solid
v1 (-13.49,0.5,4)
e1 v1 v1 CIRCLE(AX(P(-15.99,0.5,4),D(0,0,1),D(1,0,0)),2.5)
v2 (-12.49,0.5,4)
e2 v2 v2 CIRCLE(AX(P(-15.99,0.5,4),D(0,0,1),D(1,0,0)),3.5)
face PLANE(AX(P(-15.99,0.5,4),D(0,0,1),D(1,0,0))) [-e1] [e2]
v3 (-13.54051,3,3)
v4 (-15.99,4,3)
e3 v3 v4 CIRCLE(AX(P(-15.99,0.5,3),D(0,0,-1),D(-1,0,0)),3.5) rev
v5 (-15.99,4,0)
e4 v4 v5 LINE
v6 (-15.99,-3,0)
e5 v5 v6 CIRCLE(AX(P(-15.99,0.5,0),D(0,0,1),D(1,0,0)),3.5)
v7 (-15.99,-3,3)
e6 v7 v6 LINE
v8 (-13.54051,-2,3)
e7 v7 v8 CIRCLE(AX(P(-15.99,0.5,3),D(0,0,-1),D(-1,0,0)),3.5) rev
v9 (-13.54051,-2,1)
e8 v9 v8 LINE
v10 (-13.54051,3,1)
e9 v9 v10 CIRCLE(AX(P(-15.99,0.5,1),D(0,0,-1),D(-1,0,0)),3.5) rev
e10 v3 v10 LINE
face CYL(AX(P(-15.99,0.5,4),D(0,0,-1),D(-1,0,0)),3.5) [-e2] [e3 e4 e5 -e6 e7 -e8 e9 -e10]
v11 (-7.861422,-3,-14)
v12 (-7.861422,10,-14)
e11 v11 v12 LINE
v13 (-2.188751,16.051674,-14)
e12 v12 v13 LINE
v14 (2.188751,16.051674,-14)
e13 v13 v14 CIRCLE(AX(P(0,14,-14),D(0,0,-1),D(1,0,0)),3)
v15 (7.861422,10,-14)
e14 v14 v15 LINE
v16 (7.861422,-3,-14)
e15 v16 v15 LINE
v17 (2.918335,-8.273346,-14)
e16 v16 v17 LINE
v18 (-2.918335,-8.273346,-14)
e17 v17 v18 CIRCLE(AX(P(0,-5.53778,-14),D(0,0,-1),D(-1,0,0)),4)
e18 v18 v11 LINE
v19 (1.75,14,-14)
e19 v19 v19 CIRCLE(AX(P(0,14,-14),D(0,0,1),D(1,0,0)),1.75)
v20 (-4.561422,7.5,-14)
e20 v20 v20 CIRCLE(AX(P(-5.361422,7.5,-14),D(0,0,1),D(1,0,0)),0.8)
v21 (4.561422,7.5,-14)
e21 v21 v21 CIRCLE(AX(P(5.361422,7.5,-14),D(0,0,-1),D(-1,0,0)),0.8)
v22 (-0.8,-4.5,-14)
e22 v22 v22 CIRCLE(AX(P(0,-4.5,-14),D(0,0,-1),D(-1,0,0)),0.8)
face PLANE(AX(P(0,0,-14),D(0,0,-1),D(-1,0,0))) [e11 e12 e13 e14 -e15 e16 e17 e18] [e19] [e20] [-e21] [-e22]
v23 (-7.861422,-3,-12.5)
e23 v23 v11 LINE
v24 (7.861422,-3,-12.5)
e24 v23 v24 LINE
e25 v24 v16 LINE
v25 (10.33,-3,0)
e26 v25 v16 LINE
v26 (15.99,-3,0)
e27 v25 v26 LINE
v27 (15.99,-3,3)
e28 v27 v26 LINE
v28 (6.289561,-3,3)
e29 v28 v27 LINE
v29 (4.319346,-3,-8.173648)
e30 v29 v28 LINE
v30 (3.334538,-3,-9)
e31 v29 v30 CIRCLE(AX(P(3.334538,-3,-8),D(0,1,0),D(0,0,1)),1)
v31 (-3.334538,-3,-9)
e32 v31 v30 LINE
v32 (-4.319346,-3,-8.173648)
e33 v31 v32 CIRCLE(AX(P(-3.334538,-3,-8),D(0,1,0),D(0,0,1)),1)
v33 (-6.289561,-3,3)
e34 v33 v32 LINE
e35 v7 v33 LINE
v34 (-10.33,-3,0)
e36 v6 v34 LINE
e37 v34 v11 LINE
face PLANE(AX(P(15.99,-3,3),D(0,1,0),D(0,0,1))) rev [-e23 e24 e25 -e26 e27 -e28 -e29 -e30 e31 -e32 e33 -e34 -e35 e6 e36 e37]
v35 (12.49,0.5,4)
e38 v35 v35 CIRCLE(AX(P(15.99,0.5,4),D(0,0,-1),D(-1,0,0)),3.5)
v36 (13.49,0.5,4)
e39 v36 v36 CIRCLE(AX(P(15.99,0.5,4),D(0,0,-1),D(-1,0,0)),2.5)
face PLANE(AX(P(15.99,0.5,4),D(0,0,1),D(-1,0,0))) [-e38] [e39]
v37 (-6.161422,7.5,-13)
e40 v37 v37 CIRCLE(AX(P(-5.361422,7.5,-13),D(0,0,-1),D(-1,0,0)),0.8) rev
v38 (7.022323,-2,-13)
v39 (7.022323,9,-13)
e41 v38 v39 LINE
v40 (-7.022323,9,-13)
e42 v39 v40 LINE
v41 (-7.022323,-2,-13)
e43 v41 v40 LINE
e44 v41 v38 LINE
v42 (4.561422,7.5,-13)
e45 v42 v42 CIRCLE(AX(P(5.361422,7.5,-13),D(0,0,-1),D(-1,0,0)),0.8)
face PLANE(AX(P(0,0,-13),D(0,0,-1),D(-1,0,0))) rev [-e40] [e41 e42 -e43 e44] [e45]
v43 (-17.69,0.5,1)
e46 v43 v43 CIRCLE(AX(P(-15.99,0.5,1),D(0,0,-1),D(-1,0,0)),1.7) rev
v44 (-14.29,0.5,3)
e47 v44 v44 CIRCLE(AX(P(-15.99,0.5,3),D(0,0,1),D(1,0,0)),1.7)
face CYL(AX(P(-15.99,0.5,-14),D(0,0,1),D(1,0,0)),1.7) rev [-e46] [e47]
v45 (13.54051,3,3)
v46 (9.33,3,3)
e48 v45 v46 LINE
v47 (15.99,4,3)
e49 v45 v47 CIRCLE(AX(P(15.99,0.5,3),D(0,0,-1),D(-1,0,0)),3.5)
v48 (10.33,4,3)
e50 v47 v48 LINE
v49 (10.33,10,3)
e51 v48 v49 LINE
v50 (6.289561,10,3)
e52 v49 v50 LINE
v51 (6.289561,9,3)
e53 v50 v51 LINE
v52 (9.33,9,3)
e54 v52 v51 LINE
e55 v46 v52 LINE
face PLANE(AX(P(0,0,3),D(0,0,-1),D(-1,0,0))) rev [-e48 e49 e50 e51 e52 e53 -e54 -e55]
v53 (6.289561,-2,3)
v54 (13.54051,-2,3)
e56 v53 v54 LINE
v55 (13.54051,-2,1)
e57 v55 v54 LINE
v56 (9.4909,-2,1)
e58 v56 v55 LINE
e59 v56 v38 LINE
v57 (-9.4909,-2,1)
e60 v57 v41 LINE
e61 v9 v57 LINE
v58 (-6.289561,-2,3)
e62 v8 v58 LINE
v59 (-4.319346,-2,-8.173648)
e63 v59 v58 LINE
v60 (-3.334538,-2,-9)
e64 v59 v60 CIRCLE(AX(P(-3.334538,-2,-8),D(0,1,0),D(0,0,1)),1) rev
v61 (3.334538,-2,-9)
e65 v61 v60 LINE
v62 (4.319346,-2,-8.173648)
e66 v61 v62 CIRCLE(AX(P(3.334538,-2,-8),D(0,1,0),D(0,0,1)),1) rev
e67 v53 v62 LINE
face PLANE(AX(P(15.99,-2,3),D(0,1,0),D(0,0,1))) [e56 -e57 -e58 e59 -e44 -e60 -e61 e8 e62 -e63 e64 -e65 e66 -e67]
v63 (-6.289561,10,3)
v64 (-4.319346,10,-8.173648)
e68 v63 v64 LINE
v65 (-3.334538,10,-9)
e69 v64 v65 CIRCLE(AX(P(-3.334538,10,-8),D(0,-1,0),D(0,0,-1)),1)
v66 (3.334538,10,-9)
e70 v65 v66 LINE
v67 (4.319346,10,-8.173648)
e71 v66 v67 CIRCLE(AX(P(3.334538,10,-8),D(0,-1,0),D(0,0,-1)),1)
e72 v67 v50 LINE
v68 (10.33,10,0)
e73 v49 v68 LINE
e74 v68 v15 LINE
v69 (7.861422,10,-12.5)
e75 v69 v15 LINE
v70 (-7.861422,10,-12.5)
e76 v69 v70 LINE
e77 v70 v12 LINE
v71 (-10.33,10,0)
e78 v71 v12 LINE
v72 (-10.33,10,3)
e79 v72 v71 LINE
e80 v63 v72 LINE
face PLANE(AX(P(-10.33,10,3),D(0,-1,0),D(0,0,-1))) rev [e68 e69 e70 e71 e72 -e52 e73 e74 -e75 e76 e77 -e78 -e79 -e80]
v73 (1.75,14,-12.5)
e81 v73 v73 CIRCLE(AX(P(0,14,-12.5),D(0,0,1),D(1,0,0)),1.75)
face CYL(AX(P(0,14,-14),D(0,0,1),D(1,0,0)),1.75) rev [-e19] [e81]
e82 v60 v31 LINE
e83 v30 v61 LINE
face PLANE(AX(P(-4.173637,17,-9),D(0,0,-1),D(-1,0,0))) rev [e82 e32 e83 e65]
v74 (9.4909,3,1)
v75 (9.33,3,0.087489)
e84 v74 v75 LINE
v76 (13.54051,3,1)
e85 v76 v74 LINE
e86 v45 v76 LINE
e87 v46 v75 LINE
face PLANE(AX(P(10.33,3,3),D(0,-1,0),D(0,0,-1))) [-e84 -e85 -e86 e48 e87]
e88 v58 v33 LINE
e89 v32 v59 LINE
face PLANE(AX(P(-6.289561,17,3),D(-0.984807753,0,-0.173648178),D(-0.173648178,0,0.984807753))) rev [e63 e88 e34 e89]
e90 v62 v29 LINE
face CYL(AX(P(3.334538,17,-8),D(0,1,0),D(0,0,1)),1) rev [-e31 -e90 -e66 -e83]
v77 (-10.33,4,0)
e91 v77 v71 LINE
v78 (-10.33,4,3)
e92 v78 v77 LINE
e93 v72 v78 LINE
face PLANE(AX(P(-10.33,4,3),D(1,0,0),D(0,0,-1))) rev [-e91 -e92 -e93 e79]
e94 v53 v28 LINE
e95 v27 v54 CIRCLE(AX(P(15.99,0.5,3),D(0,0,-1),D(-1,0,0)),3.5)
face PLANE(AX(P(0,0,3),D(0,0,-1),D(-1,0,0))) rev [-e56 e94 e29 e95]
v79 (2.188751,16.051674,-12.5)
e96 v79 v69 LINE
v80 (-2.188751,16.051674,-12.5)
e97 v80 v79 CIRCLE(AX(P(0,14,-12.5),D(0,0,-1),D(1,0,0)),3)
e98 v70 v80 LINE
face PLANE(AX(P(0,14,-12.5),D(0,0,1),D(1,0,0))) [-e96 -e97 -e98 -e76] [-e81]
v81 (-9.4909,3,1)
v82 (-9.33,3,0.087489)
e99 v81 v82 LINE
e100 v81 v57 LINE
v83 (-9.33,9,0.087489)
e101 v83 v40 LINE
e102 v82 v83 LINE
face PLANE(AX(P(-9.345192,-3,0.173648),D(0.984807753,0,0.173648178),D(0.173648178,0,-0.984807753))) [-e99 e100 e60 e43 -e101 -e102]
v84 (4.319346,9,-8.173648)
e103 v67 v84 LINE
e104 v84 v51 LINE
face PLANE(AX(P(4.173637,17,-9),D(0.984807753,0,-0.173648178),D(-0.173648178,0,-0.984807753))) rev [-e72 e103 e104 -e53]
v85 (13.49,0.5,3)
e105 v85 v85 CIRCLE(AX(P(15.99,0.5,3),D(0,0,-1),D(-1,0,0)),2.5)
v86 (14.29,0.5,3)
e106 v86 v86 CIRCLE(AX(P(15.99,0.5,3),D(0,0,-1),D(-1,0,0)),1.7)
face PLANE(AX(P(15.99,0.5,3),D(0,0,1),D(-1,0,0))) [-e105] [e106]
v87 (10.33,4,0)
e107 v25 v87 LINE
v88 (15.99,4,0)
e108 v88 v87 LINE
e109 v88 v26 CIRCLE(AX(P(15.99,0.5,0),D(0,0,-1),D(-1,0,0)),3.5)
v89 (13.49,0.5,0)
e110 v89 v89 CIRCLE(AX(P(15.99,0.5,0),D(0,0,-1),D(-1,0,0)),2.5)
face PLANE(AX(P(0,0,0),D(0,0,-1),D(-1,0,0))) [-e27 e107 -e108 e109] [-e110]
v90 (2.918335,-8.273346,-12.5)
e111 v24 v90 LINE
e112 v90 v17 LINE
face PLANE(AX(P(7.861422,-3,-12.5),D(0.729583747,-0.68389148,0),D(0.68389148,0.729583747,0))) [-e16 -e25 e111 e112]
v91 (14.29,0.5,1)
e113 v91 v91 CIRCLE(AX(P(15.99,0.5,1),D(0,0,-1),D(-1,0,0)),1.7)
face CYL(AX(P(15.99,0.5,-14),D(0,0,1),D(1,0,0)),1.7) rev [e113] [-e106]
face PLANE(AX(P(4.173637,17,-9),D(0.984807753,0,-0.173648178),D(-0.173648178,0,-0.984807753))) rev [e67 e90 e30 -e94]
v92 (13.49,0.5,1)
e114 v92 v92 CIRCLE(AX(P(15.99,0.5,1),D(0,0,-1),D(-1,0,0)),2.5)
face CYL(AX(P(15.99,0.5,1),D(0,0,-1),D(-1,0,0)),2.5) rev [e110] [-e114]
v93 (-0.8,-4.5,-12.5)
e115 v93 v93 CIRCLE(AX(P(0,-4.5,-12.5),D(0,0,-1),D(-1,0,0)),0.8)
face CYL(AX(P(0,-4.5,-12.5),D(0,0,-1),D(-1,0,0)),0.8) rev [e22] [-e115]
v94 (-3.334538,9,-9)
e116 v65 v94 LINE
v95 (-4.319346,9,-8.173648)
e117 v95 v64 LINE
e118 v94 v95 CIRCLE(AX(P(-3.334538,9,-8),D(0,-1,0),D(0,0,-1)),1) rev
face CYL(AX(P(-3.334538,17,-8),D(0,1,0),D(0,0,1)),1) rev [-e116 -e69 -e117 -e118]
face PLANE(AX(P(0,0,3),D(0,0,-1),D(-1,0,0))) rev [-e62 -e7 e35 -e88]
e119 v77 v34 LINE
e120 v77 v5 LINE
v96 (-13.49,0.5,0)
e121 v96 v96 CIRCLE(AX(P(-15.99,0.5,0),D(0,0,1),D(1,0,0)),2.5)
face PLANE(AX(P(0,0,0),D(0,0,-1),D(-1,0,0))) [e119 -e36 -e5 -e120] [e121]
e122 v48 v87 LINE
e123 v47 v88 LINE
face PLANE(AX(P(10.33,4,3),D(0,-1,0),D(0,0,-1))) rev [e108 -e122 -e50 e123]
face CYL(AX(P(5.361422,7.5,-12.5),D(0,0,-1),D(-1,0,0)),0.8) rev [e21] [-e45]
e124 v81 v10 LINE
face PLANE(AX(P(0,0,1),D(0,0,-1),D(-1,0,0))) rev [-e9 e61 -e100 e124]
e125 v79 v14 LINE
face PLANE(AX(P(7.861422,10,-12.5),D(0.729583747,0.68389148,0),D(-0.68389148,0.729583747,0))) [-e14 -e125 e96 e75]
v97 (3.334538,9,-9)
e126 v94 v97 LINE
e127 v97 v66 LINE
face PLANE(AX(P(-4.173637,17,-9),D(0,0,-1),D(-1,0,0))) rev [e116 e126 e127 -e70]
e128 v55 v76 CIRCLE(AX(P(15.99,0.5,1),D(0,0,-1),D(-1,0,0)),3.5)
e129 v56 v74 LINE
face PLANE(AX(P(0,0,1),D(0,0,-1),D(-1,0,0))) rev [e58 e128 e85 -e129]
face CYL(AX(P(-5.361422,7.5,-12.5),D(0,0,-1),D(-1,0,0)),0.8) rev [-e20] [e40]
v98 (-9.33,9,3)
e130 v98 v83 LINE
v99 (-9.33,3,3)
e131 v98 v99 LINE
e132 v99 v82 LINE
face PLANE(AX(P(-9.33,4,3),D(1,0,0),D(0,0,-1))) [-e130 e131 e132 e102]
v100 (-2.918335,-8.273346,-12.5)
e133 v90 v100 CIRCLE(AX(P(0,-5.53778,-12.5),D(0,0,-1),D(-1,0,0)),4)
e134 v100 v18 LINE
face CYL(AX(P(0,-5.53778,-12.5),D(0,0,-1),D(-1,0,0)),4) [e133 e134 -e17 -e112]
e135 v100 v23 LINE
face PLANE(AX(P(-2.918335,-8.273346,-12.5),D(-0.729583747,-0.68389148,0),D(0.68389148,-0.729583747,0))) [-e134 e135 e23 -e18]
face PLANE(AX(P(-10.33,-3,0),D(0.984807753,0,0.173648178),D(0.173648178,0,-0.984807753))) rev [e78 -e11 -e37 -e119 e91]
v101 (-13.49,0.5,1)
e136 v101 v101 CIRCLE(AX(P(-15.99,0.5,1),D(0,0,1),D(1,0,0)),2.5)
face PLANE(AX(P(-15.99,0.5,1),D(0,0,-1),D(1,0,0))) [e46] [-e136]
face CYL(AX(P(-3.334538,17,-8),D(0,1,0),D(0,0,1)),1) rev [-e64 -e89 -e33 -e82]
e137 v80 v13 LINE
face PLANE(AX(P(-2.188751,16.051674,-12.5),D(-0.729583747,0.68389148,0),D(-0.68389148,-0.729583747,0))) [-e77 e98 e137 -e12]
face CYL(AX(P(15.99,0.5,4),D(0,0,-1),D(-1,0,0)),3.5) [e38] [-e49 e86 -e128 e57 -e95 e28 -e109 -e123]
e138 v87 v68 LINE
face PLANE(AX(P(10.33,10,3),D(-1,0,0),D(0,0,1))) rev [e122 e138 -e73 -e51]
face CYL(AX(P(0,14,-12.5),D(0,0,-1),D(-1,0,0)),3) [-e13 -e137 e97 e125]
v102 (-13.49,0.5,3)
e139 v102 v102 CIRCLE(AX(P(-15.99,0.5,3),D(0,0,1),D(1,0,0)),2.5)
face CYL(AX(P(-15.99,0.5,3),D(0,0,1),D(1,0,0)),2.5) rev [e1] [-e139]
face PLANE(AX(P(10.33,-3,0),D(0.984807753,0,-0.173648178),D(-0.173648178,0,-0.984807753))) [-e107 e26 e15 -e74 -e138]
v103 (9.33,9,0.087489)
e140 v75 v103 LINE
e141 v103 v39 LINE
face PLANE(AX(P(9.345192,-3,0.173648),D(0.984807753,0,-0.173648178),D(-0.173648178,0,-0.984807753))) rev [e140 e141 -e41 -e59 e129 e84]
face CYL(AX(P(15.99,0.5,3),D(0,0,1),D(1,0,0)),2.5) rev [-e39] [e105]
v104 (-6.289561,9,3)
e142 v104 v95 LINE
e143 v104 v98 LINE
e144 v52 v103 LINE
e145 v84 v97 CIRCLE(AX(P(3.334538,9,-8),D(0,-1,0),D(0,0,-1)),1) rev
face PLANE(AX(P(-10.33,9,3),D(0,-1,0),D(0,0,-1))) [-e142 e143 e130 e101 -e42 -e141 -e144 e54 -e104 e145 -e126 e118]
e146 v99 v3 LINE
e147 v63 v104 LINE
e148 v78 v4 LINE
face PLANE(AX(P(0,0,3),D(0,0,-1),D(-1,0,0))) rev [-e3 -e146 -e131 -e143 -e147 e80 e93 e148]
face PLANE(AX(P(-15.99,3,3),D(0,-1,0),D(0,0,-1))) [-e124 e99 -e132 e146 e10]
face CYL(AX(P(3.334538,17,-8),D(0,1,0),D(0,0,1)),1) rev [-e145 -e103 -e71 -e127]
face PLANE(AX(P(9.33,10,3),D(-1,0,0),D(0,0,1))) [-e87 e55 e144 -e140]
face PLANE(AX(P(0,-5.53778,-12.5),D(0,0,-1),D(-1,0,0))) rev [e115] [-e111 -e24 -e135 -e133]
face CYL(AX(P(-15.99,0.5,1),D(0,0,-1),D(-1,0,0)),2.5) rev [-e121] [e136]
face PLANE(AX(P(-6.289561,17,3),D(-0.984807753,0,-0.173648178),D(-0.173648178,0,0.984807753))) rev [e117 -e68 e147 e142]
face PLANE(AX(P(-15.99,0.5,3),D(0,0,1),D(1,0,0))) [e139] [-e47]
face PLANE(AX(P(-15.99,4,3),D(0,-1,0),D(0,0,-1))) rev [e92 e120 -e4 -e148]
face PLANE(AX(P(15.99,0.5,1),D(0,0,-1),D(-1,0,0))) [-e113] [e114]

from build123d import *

# Parameters (mm, degrees)
ESTRUSIONE_ESTRUSIONE1_DEPTH = 3
SCHIZZO2_W                   = 20.66
SCHIZZO2_H                   = 13
ESTRUSIONE_ESTRUSIONE2_DEPTH = 14
TAGLIO_ESTRUSIONE1_DEPTH     = 25.91345219
SVUOTA1_T                    = -1
SCHIZZO4_R                   = 3.5
ESTRUSIONE_ESTRUSIONE3_DEPTH = 4
SCHIZZO5_R                   = 2.5
TAGLIO_ESTRUSIONE2_DEPTH     = 1
SCHIZZO6_R                   = 1.7
TAGLIO_ESTRUSIONE3_DEPTH     = 28.728326671
ESTRUSIONE_ESTRUSIONE4_DEPTH = 1.5
SCHIZZO8_R                   = 1.75
TAGLIO_ESTRUSIONE4_DEPTH     = 31.677517827
SCHIZZO9_R                   = 0.8
TAGLIO_ESTRUSIONE5_DEPTH     = 1.5
TAGLIO_ESTRUSIONE6_DEPTH     = 32.238759578
RACCORDO1_R                  = 1
SPECCHIA12_START             = 9
SPECCHIA12_DEPTH             = 1
RACCORDO2_R                  = 1
SPECCHIA15_START             = 9
SPECCHIA15_DEPTH             = 1
SCHIZZO12_R                  = 0.8
ESTRUSIONE_ESTRUSIONE5_DEPTH = 1.5
TAGLIO_ESTRUSIONE7_START     = -1
SCHIZZO13_R                  = 2.5
TAGLIO_ESTRUSIONE7_DEPTH     = 1


# Read off the part's stored shape, not the designer's step: Specchia12, Specchia15
with BuildPart() as part:
    # Schizzo1 → Estrusione-Estrusione1 (new body)
    with BuildSketch(Plane.XY):
        Polygon((-15.99, 4), (-10.33, 4), (-10.33, 10), (10.33, 10), (10.33, 4), (15.99, 4), (15.99, -3), (-15.99, -3), align=None)
    extrude(amount=ESTRUSIONE_ESTRUSIONE1_DEPTH)

    # Schizzo2 → Estrusione-Estrusione2 (add)
    with BuildSketch(Plane.XY):
        with Locations((0, 3.5)):
            Rectangle(SCHIZZO2_W, SCHIZZO2_H)
    extrude(amount=-ESTRUSIONE_ESTRUSIONE2_DEPTH)

    # Schizzo3 → Taglio-Estrusione1 (cut, through all)
    with BuildSketch(Plane(origin=(0, 10, 0), x_dir=(1, 0, 0), z_dir=(0, 1, 0))):
        Polygon((-10.33, 0), (-7.86142227, 14), (-10.33, 14), align=None)
    taglio_estrusione1 = extrude(amount=-TAGLIO_ESTRUSIONE1_DEPTH, mode=Mode.SUBTRACT)

    # Specchia1: Taglio-Estrusione1 across plane
    add(taglio_estrusione1.mirror(Plane(origin=(0, 0, 0), x_dir=(0, 0, 1), z_dir=(1, 0, 0))), mode=Mode.SUBTRACT)

    # Svuota1
    svuota1_openings = [part.faces().sort_by_distance(p)[0] for p in [
        (0, 2.81654304, 3),
    ]]
    offset(amount=SVUOTA1_T, openings=svuota1_openings, kind=Kind.INTERSECTION)

    # Schizzo4 → Estrusione-Estrusione3 (add)
    with BuildSketch(Plane.XY):
        with Locations(Location((-15.99, 0.5, 0), (0, 0, 270))):
            Circle(SCHIZZO4_R)
    estrusione_estrusione3 = extrude(amount=ESTRUSIONE_ESTRUSIONE3_DEPTH)

    # Schizzo5 → Taglio-Estrusione2 (cut)
    with BuildSketch(Plane.XY.offset(4)):
        with Locations((-15.99, 0.5)):
            Circle(SCHIZZO5_R)
    taglio_estrusione2 = extrude(amount=-TAGLIO_ESTRUSIONE2_DEPTH, mode=Mode.SUBTRACT)

    # Schizzo6 → Taglio-Estrusione3 (cut, through all)
    with BuildSketch(Plane.XY.offset(3)):
        with Locations((-15.99, 0.5)):
            Circle(SCHIZZO6_R)
    taglio_estrusione3 = extrude(amount=-TAGLIO_ESTRUSIONE3_DEPTH, mode=Mode.SUBTRACT)

    # Specchia2: Estrusione-Estrusione3, Taglio-Estrusione2, Taglio-Estrusione3 across plane
    add(estrusione_estrusione3.mirror(Plane(origin=(0, 0, 0), x_dir=(0, 0, 1), z_dir=(1, 0, 0))))
    add(taglio_estrusione2.mirror(Plane(origin=(0, 0, 0), x_dir=(0, 0, 1), z_dir=(1, 0, 0))), mode=Mode.SUBTRACT)
    add(taglio_estrusione3.mirror(Plane(origin=(0, 0, 0), x_dir=(0, 0, 1), z_dir=(1, 0, 0))), mode=Mode.SUBTRACT)

    # Schizzo7 → Estrusione-Estrusione4 (add)
    with BuildSketch(Plane(origin=(0, 0, -14), x_dir=(-1, 0, 0), z_dir=(0, 0, -1))):
        with BuildLine():
            Line((-7.86142227, 10), (-2.188751242, 16.051674439))
            ThreePointArc((-2.188751242, 16.051674439), (0, 17), (2.188751242, 16.051674439))
            Line((2.188751242, 16.051674439), (7.86142227, 10))
            Line((7.86142227, 10), (-7.86142227, 10))
        make_face()
    extrude(amount=-ESTRUSIONE_ESTRUSIONE4_DEPTH)

    # Schizzo8 → Taglio-Estrusione4 (cut, through all)
    with BuildSketch(Plane.XY.offset(-12.5)):
        with Locations((0, 14)):
            Circle(SCHIZZO8_R)
    extrude(amount=-TAGLIO_ESTRUSIONE4_DEPTH, mode=Mode.SUBTRACT)

    # Schizzo9 → Taglio-Estrusione5 (cut)
    with BuildSketch(Plane(origin=(0, 0, -14), x_dir=(-1, 0, 0), z_dir=(0, 0, -1))):
        with Locations((-5.36142227, 7.5)):
            Circle(SCHIZZO9_R)
    taglio_estrusione5 = extrude(amount=-TAGLIO_ESTRUSIONE5_DEPTH, mode=Mode.SUBTRACT)

    # Specchia5: Taglio-Estrusione5 across plane
    add(taglio_estrusione5.mirror(Plane(origin=(0, 0, 0), x_dir=(0, 0, 1), z_dir=(1, 0, 0))), mode=Mode.SUBTRACT)

    # Schizzo10 → Taglio-Estrusione6 (cut, through all)
    with BuildSketch(Plane.XZ.offset(3)):
        Polygon((-6.289561189, 3), (-4.17363742, -9), (4.17363742, -9), (6.289561189, 3), align=None)
    extrude(amount=-TAGLIO_ESTRUSIONE6_DEPTH, mode=Mode.SUBTRACT)

    # Raccordo1
    raccordo1_edges = [part.edges().sort_by_distance(p)[0] for p in [
        (-4.17363742, -2.5, -9),
    ]]
    fillet(raccordo1_edges, radius=RACCORDO1_R)

    # Specchia12 outline → Specchia12 (add)
    with BuildSketch(Plane(origin=(0, 0, 0), x_dir=(1, 0, 0), z_dir=(0, 1, 0)).offset(SPECCHIA12_START)):
        with BuildLine():
            ThreePointArc((-4.319345542, 8.173648178), (-3.977325399, 8.766044443), (-3.334537789, 9))
            Line((-3.334537789, 9), (-4.17363742, 9))
            Line((-4.17363742, 9), (-4.319345542, 8.173648178))
        make_face()
    extrude(amount=SPECCHIA12_DEPTH)

    # Raccordo2
    raccordo2_edges = [part.edges().sort_by_distance(p)[0] for p in [
        (4.17363742, -2.5, -9),
    ]]
    fillet(raccordo2_edges, radius=RACCORDO2_R)

    # Specchia15 outline → Specchia15 (add)
    with BuildSketch(Plane(origin=(0, 0, 0), x_dir=(1, 0, 0), z_dir=(0, 1, 0)).offset(SPECCHIA15_START)):
        with BuildLine():
            ThreePointArc((3.334537789, 9), (3.977325399, 8.766044443), (4.319345542, 8.173648178))
            Line((4.319345542, 8.173648178), (4.17363742, 9))
            Line((4.17363742, 9), (3.334537789, 9))
        make_face()
    extrude(amount=SPECCHIA15_DEPTH)

    # Schizzo12 → Estrusione-Estrusione5 (add)
    with BuildSketch(Plane(origin=(0, 0, -14), x_dir=(-1, 0, 0), z_dir=(0, 0, -1))):
        with BuildLine():
            Line((-7.86142227, -3), (-2.918334989, -8.273345625))
            ThreePointArc((-2.918334989, -8.273345625), (0, -9.537779706), (2.918334989, -8.273345625))
            Line((2.918334989, -8.273345625), (7.86142227, -3))
            Line((7.86142227, -3), (-7.86142227, -3))
        make_face()
        with Locations((0, -4.5)):
            Circle(SCHIZZO12_R, mode=Mode.SUBTRACT)
    extrude(amount=-ESTRUSIONE_ESTRUSIONE5_DEPTH)

    # Schizzo13 → Taglio-Estrusione7 (cut)
    with BuildSketch(Plane(origin=(0, 0, 0), x_dir=(-1, 0, 0), z_dir=(0, 0, -1)).offset(TAGLIO_ESTRUSIONE7_START)):
        with Locations((-15.99, 0.5)):
            Circle(SCHIZZO13_R)
    taglio_estrusione7 = extrude(amount=TAGLIO_ESTRUSIONE7_DEPTH, mode=Mode.SUBTRACT)

    # Specchia16: Taglio-Estrusione7 across plane
    add(taglio_estrusione7.mirror(Plane(origin=(0, 0, 0), x_dir=(0, 0, 1), z_dir=(1, 0, 0))), mode=Mode.SUBTRACT)


solid = part.part
